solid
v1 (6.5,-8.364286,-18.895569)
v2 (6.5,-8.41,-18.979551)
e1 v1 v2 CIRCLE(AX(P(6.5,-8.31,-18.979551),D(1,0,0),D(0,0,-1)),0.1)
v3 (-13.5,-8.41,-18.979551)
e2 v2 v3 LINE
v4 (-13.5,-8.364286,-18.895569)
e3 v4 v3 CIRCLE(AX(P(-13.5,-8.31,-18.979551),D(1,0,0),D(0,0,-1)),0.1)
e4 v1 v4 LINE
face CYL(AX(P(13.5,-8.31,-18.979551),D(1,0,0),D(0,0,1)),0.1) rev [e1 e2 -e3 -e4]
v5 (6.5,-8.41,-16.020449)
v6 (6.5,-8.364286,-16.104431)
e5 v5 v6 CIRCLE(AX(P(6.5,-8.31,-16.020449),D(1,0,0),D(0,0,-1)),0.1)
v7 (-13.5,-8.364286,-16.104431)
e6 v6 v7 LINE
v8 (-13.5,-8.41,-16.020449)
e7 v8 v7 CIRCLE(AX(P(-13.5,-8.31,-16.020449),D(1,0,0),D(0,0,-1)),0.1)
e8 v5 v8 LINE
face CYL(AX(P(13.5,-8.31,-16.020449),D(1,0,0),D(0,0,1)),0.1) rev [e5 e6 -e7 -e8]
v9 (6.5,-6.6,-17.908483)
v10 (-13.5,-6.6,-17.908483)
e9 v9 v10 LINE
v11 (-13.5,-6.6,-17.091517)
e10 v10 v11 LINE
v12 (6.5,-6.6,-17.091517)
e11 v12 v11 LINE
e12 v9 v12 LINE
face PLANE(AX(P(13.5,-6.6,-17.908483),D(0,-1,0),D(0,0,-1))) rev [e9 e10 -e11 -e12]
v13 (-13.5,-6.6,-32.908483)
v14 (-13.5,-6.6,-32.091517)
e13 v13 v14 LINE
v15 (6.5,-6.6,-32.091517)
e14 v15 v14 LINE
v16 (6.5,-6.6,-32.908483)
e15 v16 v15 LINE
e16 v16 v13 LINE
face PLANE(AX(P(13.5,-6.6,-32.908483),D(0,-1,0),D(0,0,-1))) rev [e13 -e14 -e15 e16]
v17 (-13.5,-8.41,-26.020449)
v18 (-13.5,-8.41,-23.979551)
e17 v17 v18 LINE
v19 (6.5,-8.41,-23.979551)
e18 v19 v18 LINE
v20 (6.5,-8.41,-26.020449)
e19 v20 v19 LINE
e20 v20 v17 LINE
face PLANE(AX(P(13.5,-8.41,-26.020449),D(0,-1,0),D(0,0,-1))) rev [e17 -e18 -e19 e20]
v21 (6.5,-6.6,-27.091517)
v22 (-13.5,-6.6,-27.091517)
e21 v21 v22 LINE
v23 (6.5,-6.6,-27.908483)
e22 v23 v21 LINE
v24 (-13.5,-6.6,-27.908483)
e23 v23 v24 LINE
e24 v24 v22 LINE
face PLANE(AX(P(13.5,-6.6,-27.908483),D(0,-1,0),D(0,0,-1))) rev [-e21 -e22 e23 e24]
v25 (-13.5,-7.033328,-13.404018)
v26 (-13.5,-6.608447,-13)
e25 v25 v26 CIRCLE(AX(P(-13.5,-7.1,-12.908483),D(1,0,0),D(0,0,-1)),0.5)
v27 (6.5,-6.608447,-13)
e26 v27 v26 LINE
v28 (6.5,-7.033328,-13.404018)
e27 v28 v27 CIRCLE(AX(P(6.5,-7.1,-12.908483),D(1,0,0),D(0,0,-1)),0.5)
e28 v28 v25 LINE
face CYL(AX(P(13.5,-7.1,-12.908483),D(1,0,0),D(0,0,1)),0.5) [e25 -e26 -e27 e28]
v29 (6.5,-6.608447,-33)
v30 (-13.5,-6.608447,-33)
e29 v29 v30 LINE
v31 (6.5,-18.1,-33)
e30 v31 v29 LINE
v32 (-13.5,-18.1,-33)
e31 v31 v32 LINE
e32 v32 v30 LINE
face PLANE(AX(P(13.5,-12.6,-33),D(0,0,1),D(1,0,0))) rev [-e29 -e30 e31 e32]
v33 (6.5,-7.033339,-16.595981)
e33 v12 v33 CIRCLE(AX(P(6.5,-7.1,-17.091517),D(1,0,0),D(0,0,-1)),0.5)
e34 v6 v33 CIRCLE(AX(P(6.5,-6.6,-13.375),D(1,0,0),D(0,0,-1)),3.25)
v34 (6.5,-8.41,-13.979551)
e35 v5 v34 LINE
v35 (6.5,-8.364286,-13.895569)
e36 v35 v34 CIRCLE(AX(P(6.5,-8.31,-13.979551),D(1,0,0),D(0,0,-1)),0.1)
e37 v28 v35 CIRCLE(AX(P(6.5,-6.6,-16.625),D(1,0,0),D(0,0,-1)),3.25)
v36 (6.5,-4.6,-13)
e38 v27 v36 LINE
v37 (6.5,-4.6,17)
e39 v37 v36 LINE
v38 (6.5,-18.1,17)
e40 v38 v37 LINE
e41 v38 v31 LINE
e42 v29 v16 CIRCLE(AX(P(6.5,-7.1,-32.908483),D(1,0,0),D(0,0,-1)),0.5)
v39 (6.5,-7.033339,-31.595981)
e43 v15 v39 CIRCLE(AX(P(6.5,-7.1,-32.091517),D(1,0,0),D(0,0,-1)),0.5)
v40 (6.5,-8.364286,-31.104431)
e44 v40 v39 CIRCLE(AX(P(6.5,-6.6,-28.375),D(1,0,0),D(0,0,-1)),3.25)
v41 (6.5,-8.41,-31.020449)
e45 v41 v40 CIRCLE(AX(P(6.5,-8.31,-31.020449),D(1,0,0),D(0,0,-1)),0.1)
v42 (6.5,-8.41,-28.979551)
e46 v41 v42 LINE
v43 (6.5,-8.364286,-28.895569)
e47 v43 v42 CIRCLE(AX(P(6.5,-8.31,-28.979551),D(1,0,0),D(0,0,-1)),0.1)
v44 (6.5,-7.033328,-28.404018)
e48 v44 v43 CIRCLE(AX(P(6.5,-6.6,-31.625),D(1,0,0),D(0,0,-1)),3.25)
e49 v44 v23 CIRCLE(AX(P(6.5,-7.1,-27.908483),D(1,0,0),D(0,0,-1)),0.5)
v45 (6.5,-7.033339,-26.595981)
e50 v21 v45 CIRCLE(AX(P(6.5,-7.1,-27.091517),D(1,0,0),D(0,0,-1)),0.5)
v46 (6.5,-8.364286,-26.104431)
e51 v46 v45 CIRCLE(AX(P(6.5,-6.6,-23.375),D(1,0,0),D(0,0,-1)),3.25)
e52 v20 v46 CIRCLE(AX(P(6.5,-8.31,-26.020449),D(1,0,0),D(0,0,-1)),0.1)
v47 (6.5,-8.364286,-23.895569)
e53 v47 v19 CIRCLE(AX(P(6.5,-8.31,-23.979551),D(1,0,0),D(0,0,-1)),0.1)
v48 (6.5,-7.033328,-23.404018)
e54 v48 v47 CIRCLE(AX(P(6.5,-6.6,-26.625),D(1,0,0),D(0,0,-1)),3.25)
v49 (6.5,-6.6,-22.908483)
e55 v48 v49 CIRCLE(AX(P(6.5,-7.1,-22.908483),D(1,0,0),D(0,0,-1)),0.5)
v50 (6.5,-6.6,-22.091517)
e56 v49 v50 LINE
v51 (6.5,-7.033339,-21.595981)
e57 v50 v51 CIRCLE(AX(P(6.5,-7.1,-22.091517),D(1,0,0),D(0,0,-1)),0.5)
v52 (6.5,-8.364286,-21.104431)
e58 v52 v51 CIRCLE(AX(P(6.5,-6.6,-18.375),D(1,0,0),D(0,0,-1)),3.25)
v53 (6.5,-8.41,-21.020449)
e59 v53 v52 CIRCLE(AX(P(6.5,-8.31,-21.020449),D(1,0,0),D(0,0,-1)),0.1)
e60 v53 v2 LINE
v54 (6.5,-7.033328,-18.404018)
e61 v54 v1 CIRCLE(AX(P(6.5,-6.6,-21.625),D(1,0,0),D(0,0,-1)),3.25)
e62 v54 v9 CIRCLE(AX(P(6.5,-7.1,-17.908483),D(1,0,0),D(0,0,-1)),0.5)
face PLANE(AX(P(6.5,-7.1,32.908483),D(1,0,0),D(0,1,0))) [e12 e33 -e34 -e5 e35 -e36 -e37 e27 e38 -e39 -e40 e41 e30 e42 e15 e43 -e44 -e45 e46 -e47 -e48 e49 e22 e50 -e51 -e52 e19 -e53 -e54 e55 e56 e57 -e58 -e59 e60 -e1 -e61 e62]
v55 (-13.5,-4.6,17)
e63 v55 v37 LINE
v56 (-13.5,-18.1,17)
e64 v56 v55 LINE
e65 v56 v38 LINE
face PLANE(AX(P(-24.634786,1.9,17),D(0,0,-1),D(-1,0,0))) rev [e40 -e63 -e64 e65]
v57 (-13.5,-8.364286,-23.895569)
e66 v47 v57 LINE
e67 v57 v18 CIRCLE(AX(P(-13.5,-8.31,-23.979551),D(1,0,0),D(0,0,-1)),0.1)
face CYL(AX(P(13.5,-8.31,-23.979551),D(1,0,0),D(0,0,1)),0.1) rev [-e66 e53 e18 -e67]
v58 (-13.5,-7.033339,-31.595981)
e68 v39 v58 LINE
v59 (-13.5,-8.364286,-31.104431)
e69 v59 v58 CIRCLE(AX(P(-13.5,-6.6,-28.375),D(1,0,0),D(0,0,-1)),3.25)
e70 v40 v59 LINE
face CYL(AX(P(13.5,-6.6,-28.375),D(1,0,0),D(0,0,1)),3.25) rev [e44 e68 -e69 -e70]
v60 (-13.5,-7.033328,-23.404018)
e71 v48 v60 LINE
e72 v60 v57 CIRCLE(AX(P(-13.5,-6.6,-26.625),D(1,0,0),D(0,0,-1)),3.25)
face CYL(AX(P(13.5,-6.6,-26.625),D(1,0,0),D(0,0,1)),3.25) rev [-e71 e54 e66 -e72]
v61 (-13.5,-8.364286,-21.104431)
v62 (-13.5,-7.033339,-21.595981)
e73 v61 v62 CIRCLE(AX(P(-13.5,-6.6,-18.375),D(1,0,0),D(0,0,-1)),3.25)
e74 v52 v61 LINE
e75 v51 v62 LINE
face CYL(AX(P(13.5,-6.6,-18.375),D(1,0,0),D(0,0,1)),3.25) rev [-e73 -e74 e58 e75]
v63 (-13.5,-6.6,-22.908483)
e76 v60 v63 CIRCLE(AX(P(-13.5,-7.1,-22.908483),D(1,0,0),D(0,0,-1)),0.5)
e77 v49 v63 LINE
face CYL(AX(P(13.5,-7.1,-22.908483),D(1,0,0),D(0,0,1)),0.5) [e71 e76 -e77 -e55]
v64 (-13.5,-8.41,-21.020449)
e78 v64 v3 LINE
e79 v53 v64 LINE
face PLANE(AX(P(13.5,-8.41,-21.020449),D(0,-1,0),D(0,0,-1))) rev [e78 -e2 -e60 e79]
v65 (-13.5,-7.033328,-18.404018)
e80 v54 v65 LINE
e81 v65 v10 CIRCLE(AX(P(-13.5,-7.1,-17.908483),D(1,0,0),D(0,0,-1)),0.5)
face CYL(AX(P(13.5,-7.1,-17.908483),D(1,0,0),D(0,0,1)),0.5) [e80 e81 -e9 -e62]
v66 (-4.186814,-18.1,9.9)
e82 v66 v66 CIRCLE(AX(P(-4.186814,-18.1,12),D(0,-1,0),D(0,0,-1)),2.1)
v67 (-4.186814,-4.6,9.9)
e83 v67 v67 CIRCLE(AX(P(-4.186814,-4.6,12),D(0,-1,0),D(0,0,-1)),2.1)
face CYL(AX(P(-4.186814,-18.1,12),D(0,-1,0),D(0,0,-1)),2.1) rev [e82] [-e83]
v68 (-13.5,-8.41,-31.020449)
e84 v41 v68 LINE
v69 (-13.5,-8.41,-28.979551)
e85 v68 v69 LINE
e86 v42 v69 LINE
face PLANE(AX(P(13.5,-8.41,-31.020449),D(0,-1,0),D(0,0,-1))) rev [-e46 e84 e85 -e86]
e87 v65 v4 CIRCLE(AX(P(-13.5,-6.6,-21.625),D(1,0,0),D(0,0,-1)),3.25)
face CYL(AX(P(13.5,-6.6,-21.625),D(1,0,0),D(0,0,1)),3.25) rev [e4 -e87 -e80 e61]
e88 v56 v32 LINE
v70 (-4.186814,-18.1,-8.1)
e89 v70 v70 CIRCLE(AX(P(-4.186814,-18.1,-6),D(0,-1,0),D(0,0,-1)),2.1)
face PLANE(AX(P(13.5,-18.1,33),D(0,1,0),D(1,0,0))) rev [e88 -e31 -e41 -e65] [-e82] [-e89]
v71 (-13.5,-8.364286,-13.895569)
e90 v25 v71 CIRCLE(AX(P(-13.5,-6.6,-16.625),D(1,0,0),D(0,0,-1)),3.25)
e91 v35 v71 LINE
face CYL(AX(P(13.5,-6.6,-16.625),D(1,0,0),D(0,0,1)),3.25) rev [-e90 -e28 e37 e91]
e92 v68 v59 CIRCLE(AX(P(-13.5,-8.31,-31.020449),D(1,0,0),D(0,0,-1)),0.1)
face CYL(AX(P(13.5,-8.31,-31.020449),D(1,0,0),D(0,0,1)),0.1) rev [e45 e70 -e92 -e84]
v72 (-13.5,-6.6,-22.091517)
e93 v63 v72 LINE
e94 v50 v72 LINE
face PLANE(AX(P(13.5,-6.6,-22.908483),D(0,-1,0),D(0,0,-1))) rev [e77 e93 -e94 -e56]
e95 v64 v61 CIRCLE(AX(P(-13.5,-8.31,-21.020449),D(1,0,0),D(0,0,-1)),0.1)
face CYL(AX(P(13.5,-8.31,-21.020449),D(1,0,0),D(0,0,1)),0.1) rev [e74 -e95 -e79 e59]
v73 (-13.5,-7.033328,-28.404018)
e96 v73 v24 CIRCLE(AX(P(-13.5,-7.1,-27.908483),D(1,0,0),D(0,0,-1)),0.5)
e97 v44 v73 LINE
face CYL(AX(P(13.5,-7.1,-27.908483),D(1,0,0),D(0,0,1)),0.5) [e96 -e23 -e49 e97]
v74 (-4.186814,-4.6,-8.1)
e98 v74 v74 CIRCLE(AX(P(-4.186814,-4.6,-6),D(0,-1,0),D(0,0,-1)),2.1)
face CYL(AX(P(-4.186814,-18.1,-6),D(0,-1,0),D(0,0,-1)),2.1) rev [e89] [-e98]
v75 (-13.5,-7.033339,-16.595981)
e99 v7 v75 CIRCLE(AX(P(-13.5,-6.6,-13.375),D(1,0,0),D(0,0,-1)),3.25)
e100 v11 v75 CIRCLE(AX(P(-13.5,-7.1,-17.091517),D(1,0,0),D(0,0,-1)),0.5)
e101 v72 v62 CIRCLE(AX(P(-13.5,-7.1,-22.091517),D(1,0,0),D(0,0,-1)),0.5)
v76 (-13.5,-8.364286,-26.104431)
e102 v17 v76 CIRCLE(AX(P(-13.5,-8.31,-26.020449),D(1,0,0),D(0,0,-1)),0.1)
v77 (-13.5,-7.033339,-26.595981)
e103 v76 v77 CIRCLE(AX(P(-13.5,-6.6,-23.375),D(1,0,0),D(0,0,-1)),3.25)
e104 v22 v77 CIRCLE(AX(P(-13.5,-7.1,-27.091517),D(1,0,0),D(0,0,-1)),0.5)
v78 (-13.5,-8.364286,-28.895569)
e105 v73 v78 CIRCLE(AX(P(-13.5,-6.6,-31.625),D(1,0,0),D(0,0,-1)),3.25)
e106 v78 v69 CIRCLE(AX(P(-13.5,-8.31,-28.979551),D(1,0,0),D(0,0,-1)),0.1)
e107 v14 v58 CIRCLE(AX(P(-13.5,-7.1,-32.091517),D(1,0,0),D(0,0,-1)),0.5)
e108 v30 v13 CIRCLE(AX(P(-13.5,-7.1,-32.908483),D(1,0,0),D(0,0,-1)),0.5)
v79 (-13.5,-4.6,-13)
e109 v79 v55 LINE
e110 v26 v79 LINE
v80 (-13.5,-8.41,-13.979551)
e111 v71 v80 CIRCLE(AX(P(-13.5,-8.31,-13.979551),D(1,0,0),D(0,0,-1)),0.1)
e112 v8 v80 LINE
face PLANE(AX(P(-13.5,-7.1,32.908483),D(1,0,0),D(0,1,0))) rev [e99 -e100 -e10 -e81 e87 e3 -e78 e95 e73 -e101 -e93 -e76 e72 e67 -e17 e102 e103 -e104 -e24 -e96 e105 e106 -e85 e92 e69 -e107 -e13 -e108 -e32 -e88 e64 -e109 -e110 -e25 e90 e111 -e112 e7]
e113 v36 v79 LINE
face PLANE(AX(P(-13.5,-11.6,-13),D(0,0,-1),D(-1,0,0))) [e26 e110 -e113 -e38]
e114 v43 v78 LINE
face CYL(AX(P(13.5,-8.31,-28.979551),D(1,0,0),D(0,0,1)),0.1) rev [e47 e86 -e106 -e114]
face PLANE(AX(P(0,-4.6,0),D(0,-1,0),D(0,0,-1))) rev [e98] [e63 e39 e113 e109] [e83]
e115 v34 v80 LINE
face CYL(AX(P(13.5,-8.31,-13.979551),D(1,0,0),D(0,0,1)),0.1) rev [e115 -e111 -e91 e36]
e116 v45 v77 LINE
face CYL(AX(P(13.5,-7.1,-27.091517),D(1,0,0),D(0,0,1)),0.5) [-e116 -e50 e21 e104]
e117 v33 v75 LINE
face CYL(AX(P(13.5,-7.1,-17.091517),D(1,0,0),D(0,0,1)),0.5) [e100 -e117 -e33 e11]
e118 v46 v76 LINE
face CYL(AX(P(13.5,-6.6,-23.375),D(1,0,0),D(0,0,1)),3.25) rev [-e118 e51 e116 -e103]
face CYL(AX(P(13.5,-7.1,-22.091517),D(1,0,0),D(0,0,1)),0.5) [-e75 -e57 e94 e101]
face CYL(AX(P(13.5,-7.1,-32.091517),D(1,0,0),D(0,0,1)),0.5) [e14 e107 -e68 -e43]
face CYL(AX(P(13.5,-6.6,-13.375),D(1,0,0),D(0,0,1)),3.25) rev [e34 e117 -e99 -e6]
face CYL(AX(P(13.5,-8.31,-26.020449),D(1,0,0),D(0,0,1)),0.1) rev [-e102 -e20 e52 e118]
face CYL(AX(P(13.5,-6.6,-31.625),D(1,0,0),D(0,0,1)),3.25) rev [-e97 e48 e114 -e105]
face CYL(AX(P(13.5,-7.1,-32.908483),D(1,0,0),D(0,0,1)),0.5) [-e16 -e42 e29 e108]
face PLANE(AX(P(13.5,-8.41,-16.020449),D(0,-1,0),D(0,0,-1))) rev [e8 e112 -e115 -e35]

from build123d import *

# Parameters (mm, degrees)
DELETE_START           = -13.5
DELETE_FACE_1_DEPTH    = 27
MOVE_FACE_1_BY         = 7
MOVE_FACE_2_BY         = 5.5
SKETCH_2_W             = 48.263019836
SKETCH_2_H             = 43.058184364
CUT_EXTRUDE_1_DEPTH    = 20
EXTRUDE_1_DEPTH        = 2
EXTRUDE_1_DEPTH_BACK   = 5
SKETCH_3_W             = 20
SKETCH_3_H             = 30
HOLE_WIZARD_M5_1_D     = 4.2
HOLE_WIZARD_M5_1_DEPTH = 20
HOLE_WIZARD_M5_1_TIP   = 1.2618073


with BuildPart() as part:
    # Delete Face 1: read off the stored shape, not the designer's step
    # Delete Face 1 outline → Delete Face 1 (new body)
    with BuildSketch(Plane.YZ.offset(DELETE_START)):
        with BuildLine():
            ThreePointArc((-8.364285714, 23.895568572), (-8.397831007, 23.931741933), (-8.41, 23.979551078))
            Line((-8.41, 23.979551078), (-8.41, 26.020448922))
            ThreePointArc((-8.41, 26.020448922), (-8.397831007, 26.068258067), (-8.364285714, 26.104431428))
            ThreePointArc((-8.364285714, 26.104431428), (-7.725958169, 26.423724028), (-7.033327746, 26.595982314))
            ThreePointArc((-7.033327746, 26.595982314), (-6.723611818, 26.762379014), (-6.6, 27.091517187))
            Line((-6.6, 27.091517187), (-6.6, 27.908482813))
            ThreePointArc((-6.6, 27.908482813), (-6.723615527, 28.237625227), (-7.033338915, 28.404019189))
            ThreePointArc((-7.033338915, 28.404019189), (-7.725963455, 28.576277924), (-8.364285714, 28.895568572))
            ThreePointArc((-8.364285714, 28.895568572), (-8.397831007, 28.931741933), (-8.41, 28.979551078))
            Line((-8.41, 28.979551078), (-8.41, 31.020448922))
            ThreePointArc((-8.41, 31.020448922), (-8.397831007, 31.068258067), (-8.364285714, 31.104431428))
            ThreePointArc((-8.364285714, 31.104431428), (-7.725958168, 31.423724029), (-7.033327744, 31.595982314))
            ThreePointArc((-7.033327744, 31.595982314), (-6.723611817, 31.762379015), (-6.6, 32.091517187))
            Line((-6.6, 32.091517187), (-6.6, 32.908482813))
            ThreePointArc((-6.6, 32.908482813), (-6.602116164, 32.954435895), (-6.608446743, 33))
            Line((-6.608446743, 33), (-12.6, 33))
            Line((-12.6, 33), (-12.6, -33))
            Line((-12.6, -33), (-6.608446743, -33))
            ThreePointArc((-6.608446743, -33), (-6.602116164, -32.954435895), (-6.6, -32.908482813))
            Line((-6.6, -32.908482813), (-6.6, -32.091517187))
            ThreePointArc((-6.6, -32.091517187), (-6.723615531, -31.762374768), (-7.033338927, -31.595980809))
            ThreePointArc((-7.033338927, -31.595980809), (-7.72596346, -31.423722074), (-8.364285714, -31.104431428))
            ThreePointArc((-8.364285714, -31.104431428), (-8.397831007, -31.068258067), (-8.41, -31.020448922))
            Line((-8.41, -31.020448922), (-8.41, -28.979551078))
            ThreePointArc((-8.41, -28.979551078), (-8.397831007, -28.931741933), (-8.364285714, -28.895568572))
            ThreePointArc((-8.364285714, -28.895568572), (-7.725958168, -28.576275971), (-7.033327744, -28.404017686))
            ThreePointArc((-7.033327744, -28.404017686), (-6.723611817, -28.237620985), (-6.6, -27.908482813))
            Line((-6.6, -27.908482813), (-6.6, -27.091517187))
            ThreePointArc((-6.6, -27.091517187), (-6.723615528, -26.762374772), (-7.033338917, -26.595980811))
            ThreePointArc((-7.033338917, -26.595980811), (-7.725963456, -26.423722076), (-8.364285714, -26.104431428))
            ThreePointArc((-8.364285714, -26.104431428), (-8.397831007, -26.068258067), (-8.41, -26.020448922))
            Line((-8.41, -26.020448922), (-8.41, -23.979551078))
            ThreePointArc((-8.41, -23.979551078), (-8.397831007, -23.931741933), (-8.364285714, -23.895568572))
            ThreePointArc((-8.364285714, -23.895568572), (-7.725958169, -23.576275972), (-7.033327746, -23.404017686))
            ThreePointArc((-7.033327746, -23.404017686), (-6.723611818, -23.237620986), (-6.6, -22.908482813))
            Line((-6.6, -22.908482813), (-6.6, -22.091517187))
            ThreePointArc((-6.6, -22.091517187), (-6.723615529, -21.76237477), (-7.033338921, -21.59598081))
            ThreePointArc((-7.033338921, -21.59598081), (-7.725963458, -21.423722075), (-8.364285714, -21.104431428))
            ThreePointArc((-8.364285714, -21.104431428), (-8.397831007, -21.068258067), (-8.41, -21.020448922))
            Line((-8.41, -21.020448922), (-8.41, -18.979551078))
            ThreePointArc((-8.41, -18.979551078), (-8.397831007, -18.931741933), (-8.364285714, -18.895568572))
            ThreePointArc((-8.364285714, -18.895568572), (-7.725958168, -18.576275971), (-7.033327744, -18.404017686))
            ThreePointArc((-7.033327744, -18.404017686), (-6.723611817, -18.237620985), (-6.6, -17.908482813))
            Line((-6.6, -17.908482813), (-6.6, -17.091517187))
            ThreePointArc((-6.6, -17.091517187), (-6.723615531, -16.762374768), (-7.033338926, -16.595980809))
            ThreePointArc((-7.033338926, -16.595980809), (-7.72596346, -16.423722074), (-8.364285714, -16.104431428))
            ThreePointArc((-8.364285714, -16.104431428), (-8.397831007, -16.068258067), (-8.41, -16.020448922))
            Line((-8.41, -16.020448922), (-8.41, -13.979551078))
            ThreePointArc((-8.41, -13.979551078), (-8.397831007, -13.931741933), (-8.364285714, -13.895568572))
            ThreePointArc((-8.364285714, -13.895568572), (-7.725958337, -13.576276034), (-7.033328102, -13.404017734))
            ThreePointArc((-7.033328102, -13.404017734), (-6.723611936, -13.237621121), (-6.6, -12.908482813))
            Line((-6.6, -12.908482813), (-6.6, -12.091517187))
            ThreePointArc((-6.6, -12.091517187), (-6.723615532, -11.762374767), (-7.033338929, -11.595980809))
            ThreePointArc((-7.033338929, -11.595980809), (-7.725963462, -11.423722074), (-8.364285714, -11.104431428))
            ThreePointArc((-8.364285714, -11.104431428), (-8.397831007, -11.068258067), (-8.41, -11.020448922))
            Line((-8.41, -11.020448922), (-8.41, -8.979551078))
            ThreePointArc((-8.41, -8.979551078), (-8.397831007, -8.931741933), (-8.364285714, -8.895568572))
            ThreePointArc((-8.364285714, -8.895568572), (-7.725958524, -8.576276103), (-7.033328496, -8.404017787))
            ThreePointArc((-7.033328496, -8.404017787), (-6.723612067, -8.23762127), (-6.6, -7.908482813))
            Line((-6.6, -7.908482813), (-6.6, -7.091517187))
            ThreePointArc((-6.6, -7.091517187), (-6.723615306, -6.762375026), (-7.033338249, -6.595980901))
            ThreePointArc((-7.033338249, -6.595980901), (-7.72596314, -6.423722193), (-8.364285714, -6.104431428))
            ThreePointArc((-8.364285714, -6.104431428), (-8.397831007, -6.068258067), (-8.41, -6.020448922))
            Line((-8.41, -6.020448922), (-8.41, -3.979551078))
            ThreePointArc((-8.41, -3.979551078), (-8.397831007, -3.931741933), (-8.364285714, -3.895568572))
            ThreePointArc((-8.364285714, -3.895568572), (-7.725958462, -3.57627608), (-7.033328366, -3.40401777))
            ThreePointArc((-7.033328366, -3.40401777), (-6.723612024, -3.237621221), (-6.6, -2.908482813))
            Line((-6.6, -2.908482813), (-6.6, -2.091517187))
            ThreePointArc((-6.6, -2.091517187), (-6.723615307, -1.762375024), (-7.033338252, -1.5959809))
            ThreePointArc((-7.033338252, -1.5959809), (-7.725963141, -1.423722192), (-8.364285714, -1.104431428))
            ThreePointArc((-8.364285714, -1.104431428), (-8.397831007, -1.068258067), (-8.41, -1.020448922))
            Line((-8.41, -1.020448922), (-8.41, 1.020448922))
            ThreePointArc((-8.41, 1.020448922), (-8.397831007, 1.068258067), (-8.364285714, 1.104431428))
            ThreePointArc((-8.364285714, 1.104431428), (-7.725958462, 1.42372392), (-7.033328366, 1.59598223))
            ThreePointArc((-7.033328366, 1.59598223), (-6.723612024, 1.762378779), (-6.6, 2.091517187))
            Line((-6.6, 2.091517187), (-6.6, 2.908482813))
            ThreePointArc((-6.6, 2.908482813), (-6.723615307, 3.237624975), (-7.033338252, 3.4040191))
            ThreePointArc((-7.033338252, 3.4040191), (-7.725963141, 3.576277808), (-8.364285714, 3.895568572))
            ThreePointArc((-8.364285714, 3.895568572), (-8.397831007, 3.931741933), (-8.41, 3.979551078))
            Line((-8.41, 3.979551078), (-8.41, 6.020448922))
            ThreePointArc((-8.41, 6.020448922), (-8.397831007, 6.068258067), (-8.364285714, 6.104431428))
            ThreePointArc((-8.364285714, 6.104431428), (-7.725958469, 6.423723918), (-7.03332838, 6.595982228))
            ThreePointArc((-7.03332838, 6.595982228), (-6.723612029, 6.762378774), (-6.6, 7.091517187))
            Line((-6.6, 7.091517187), (-6.6, 7.908482813))
            ThreePointArc((-6.6, 7.908482813), (-6.723615311, 8.23762498), (-7.033338263, 8.404019101))
            ThreePointArc((-7.033338263, 8.404019101), (-7.725963146, 8.57627781), (-8.364285714, 8.895568572))
            ThreePointArc((-8.364285714, 8.895568572), (-8.397831007, 8.931741933), (-8.41, 8.979551078))
            Line((-8.41, 8.979551078), (-8.41, 11.020448922))
            ThreePointArc((-8.41, 11.020448922), (-8.397831007, 11.068258067), (-8.364285714, 11.104431428))
            ThreePointArc((-8.364285714, 11.104431428), (-7.725958337, 11.423723966), (-7.033328101, 11.595982266))
            ThreePointArc((-7.033328101, 11.595982266), (-6.723611936, 11.76237888), (-6.6, 12.091517187))
            Line((-6.6, 12.091517187), (-6.6, 12.908482813))
            ThreePointArc((-6.6, 12.908482813), (-6.72361553, 13.237625231), (-7.033338924, 13.40401919))
            ThreePointArc((-7.033338924, 13.40401919), (-7.725963459, 13.576277925), (-8.364285714, 13.895568572))
            ThreePointArc((-8.364285714, 13.895568572), (-8.397831007, 13.931741933), (-8.41, 13.979551078))
            Line((-8.41, 13.979551078), (-8.41, 16.020448922))
            ThreePointArc((-8.41, 16.020448922), (-8.397831007, 16.068258067), (-8.364285714, 16.104431428))
            ThreePointArc((-8.364285714, 16.104431428), (-7.725958169, 16.423724029), (-7.033327745, 16.595982314))
            ThreePointArc((-7.033327745, 16.595982314), (-6.723611818, 16.762379015), (-6.6, 17.091517187))
            Line((-6.6, 17.091517187), (-6.6, 17.908482813))
            ThreePointArc((-6.6, 17.908482813), (-6.72361553, 18.23762523), (-7.033338923, 18.40401919))
            ThreePointArc((-7.033338923, 18.40401919), (-7.725963459, 18.576277925), (-8.364285714, 18.895568572))
            ThreePointArc((-8.364285714, 18.895568572), (-8.397831007, 18.931741933), (-8.41, 18.979551078))
            Line((-8.41, 18.979551078), (-8.41, 21.020448922))
            ThreePointArc((-8.41, 21.020448922), (-8.397831007, 21.068258067), (-8.364285714, 21.104431428))
            ThreePointArc((-8.364285714, 21.104431428), (-7.725958168, 21.423724029), (-7.033327744, 21.595982314))
            ThreePointArc((-7.033327744, 21.595982314), (-6.723611817, 21.762379015), (-6.6, 22.091517187))
            Line((-6.6, 22.091517187), (-6.6, 22.908482813))
            ThreePointArc((-6.6, 22.908482813), (-6.723615528, 23.237625227), (-7.033338915, 23.404019189))
            ThreePointArc((-7.033338915, 23.404019189), (-7.725963455, 23.576277924), (-8.364285714, 23.895568572))
        make_face()
    extrude(amount=DELETE_FACE_1_DEPTH)

    # Move Face 1: a face moved inward by 7.0
    extrude(part.faces().sort_by_distance((13.5, -10.05864991, 0))[0], amount=MOVE_FACE_1_BY, dir=(-1, 0, 0), mode=Mode.SUBTRACT)

    # Move Face 2: a face moved outward by 5.5
    extrude(part.faces().sort_by_distance((-3.5, -12.6, 0))[0], amount=MOVE_FACE_2_BY, dir=(0, -1, 0))

    # 草图2 → 切除-拉伸1 (cut)
    with BuildSketch(Plane.XZ.offset(18.1)):
        with Locations((-0.503276546, 38.529092182)):
            Rectangle(SKETCH_2_W, SKETCH_2_H)
    extrude(amount=-CUT_EXTRUDE_1_DEPTH, mode=Mode.SUBTRACT)

    # 草图3 → 凸台-拉伸1 (add, two sides: drawn at the far end of the back side and taken through both)
    with BuildSketch(Plane(origin=(0, -6.6, 0), x_dir=(1, 0, 0), z_dir=(0, 1, 0)).offset(-EXTRUDE_1_DEPTH_BACK)):
        with Locations((-3.5, -2)):
            Rectangle(SKETCH_3_W, SKETCH_3_H)
    extrude(amount=EXTRUDE_1_DEPTH + EXTRUDE_1_DEPTH_BACK)

    # M5 螺纹孔1
    with Locations(Plane(origin=(-4.186814404, -18.1, 12), x_dir=(0, 0, -1), z_dir=(0, -1, 0))):
        with Locations((0, 0), (18, 0)):
            Hole(HOLE_WIZARD_M5_1_D / 2, depth=HOLE_WIZARD_M5_1_DEPTH)
            with Locations((0, 0, -(HOLE_WIZARD_M5_1_DEPTH + HOLE_WIZARD_M5_1_TIP / 2))):  # 118° drill point
                Cone(0, HOLE_WIZARD_M5_1_D / 2, HOLE_WIZARD_M5_1_TIP, mode=Mode.SUBTRACT)


solid = part.part
